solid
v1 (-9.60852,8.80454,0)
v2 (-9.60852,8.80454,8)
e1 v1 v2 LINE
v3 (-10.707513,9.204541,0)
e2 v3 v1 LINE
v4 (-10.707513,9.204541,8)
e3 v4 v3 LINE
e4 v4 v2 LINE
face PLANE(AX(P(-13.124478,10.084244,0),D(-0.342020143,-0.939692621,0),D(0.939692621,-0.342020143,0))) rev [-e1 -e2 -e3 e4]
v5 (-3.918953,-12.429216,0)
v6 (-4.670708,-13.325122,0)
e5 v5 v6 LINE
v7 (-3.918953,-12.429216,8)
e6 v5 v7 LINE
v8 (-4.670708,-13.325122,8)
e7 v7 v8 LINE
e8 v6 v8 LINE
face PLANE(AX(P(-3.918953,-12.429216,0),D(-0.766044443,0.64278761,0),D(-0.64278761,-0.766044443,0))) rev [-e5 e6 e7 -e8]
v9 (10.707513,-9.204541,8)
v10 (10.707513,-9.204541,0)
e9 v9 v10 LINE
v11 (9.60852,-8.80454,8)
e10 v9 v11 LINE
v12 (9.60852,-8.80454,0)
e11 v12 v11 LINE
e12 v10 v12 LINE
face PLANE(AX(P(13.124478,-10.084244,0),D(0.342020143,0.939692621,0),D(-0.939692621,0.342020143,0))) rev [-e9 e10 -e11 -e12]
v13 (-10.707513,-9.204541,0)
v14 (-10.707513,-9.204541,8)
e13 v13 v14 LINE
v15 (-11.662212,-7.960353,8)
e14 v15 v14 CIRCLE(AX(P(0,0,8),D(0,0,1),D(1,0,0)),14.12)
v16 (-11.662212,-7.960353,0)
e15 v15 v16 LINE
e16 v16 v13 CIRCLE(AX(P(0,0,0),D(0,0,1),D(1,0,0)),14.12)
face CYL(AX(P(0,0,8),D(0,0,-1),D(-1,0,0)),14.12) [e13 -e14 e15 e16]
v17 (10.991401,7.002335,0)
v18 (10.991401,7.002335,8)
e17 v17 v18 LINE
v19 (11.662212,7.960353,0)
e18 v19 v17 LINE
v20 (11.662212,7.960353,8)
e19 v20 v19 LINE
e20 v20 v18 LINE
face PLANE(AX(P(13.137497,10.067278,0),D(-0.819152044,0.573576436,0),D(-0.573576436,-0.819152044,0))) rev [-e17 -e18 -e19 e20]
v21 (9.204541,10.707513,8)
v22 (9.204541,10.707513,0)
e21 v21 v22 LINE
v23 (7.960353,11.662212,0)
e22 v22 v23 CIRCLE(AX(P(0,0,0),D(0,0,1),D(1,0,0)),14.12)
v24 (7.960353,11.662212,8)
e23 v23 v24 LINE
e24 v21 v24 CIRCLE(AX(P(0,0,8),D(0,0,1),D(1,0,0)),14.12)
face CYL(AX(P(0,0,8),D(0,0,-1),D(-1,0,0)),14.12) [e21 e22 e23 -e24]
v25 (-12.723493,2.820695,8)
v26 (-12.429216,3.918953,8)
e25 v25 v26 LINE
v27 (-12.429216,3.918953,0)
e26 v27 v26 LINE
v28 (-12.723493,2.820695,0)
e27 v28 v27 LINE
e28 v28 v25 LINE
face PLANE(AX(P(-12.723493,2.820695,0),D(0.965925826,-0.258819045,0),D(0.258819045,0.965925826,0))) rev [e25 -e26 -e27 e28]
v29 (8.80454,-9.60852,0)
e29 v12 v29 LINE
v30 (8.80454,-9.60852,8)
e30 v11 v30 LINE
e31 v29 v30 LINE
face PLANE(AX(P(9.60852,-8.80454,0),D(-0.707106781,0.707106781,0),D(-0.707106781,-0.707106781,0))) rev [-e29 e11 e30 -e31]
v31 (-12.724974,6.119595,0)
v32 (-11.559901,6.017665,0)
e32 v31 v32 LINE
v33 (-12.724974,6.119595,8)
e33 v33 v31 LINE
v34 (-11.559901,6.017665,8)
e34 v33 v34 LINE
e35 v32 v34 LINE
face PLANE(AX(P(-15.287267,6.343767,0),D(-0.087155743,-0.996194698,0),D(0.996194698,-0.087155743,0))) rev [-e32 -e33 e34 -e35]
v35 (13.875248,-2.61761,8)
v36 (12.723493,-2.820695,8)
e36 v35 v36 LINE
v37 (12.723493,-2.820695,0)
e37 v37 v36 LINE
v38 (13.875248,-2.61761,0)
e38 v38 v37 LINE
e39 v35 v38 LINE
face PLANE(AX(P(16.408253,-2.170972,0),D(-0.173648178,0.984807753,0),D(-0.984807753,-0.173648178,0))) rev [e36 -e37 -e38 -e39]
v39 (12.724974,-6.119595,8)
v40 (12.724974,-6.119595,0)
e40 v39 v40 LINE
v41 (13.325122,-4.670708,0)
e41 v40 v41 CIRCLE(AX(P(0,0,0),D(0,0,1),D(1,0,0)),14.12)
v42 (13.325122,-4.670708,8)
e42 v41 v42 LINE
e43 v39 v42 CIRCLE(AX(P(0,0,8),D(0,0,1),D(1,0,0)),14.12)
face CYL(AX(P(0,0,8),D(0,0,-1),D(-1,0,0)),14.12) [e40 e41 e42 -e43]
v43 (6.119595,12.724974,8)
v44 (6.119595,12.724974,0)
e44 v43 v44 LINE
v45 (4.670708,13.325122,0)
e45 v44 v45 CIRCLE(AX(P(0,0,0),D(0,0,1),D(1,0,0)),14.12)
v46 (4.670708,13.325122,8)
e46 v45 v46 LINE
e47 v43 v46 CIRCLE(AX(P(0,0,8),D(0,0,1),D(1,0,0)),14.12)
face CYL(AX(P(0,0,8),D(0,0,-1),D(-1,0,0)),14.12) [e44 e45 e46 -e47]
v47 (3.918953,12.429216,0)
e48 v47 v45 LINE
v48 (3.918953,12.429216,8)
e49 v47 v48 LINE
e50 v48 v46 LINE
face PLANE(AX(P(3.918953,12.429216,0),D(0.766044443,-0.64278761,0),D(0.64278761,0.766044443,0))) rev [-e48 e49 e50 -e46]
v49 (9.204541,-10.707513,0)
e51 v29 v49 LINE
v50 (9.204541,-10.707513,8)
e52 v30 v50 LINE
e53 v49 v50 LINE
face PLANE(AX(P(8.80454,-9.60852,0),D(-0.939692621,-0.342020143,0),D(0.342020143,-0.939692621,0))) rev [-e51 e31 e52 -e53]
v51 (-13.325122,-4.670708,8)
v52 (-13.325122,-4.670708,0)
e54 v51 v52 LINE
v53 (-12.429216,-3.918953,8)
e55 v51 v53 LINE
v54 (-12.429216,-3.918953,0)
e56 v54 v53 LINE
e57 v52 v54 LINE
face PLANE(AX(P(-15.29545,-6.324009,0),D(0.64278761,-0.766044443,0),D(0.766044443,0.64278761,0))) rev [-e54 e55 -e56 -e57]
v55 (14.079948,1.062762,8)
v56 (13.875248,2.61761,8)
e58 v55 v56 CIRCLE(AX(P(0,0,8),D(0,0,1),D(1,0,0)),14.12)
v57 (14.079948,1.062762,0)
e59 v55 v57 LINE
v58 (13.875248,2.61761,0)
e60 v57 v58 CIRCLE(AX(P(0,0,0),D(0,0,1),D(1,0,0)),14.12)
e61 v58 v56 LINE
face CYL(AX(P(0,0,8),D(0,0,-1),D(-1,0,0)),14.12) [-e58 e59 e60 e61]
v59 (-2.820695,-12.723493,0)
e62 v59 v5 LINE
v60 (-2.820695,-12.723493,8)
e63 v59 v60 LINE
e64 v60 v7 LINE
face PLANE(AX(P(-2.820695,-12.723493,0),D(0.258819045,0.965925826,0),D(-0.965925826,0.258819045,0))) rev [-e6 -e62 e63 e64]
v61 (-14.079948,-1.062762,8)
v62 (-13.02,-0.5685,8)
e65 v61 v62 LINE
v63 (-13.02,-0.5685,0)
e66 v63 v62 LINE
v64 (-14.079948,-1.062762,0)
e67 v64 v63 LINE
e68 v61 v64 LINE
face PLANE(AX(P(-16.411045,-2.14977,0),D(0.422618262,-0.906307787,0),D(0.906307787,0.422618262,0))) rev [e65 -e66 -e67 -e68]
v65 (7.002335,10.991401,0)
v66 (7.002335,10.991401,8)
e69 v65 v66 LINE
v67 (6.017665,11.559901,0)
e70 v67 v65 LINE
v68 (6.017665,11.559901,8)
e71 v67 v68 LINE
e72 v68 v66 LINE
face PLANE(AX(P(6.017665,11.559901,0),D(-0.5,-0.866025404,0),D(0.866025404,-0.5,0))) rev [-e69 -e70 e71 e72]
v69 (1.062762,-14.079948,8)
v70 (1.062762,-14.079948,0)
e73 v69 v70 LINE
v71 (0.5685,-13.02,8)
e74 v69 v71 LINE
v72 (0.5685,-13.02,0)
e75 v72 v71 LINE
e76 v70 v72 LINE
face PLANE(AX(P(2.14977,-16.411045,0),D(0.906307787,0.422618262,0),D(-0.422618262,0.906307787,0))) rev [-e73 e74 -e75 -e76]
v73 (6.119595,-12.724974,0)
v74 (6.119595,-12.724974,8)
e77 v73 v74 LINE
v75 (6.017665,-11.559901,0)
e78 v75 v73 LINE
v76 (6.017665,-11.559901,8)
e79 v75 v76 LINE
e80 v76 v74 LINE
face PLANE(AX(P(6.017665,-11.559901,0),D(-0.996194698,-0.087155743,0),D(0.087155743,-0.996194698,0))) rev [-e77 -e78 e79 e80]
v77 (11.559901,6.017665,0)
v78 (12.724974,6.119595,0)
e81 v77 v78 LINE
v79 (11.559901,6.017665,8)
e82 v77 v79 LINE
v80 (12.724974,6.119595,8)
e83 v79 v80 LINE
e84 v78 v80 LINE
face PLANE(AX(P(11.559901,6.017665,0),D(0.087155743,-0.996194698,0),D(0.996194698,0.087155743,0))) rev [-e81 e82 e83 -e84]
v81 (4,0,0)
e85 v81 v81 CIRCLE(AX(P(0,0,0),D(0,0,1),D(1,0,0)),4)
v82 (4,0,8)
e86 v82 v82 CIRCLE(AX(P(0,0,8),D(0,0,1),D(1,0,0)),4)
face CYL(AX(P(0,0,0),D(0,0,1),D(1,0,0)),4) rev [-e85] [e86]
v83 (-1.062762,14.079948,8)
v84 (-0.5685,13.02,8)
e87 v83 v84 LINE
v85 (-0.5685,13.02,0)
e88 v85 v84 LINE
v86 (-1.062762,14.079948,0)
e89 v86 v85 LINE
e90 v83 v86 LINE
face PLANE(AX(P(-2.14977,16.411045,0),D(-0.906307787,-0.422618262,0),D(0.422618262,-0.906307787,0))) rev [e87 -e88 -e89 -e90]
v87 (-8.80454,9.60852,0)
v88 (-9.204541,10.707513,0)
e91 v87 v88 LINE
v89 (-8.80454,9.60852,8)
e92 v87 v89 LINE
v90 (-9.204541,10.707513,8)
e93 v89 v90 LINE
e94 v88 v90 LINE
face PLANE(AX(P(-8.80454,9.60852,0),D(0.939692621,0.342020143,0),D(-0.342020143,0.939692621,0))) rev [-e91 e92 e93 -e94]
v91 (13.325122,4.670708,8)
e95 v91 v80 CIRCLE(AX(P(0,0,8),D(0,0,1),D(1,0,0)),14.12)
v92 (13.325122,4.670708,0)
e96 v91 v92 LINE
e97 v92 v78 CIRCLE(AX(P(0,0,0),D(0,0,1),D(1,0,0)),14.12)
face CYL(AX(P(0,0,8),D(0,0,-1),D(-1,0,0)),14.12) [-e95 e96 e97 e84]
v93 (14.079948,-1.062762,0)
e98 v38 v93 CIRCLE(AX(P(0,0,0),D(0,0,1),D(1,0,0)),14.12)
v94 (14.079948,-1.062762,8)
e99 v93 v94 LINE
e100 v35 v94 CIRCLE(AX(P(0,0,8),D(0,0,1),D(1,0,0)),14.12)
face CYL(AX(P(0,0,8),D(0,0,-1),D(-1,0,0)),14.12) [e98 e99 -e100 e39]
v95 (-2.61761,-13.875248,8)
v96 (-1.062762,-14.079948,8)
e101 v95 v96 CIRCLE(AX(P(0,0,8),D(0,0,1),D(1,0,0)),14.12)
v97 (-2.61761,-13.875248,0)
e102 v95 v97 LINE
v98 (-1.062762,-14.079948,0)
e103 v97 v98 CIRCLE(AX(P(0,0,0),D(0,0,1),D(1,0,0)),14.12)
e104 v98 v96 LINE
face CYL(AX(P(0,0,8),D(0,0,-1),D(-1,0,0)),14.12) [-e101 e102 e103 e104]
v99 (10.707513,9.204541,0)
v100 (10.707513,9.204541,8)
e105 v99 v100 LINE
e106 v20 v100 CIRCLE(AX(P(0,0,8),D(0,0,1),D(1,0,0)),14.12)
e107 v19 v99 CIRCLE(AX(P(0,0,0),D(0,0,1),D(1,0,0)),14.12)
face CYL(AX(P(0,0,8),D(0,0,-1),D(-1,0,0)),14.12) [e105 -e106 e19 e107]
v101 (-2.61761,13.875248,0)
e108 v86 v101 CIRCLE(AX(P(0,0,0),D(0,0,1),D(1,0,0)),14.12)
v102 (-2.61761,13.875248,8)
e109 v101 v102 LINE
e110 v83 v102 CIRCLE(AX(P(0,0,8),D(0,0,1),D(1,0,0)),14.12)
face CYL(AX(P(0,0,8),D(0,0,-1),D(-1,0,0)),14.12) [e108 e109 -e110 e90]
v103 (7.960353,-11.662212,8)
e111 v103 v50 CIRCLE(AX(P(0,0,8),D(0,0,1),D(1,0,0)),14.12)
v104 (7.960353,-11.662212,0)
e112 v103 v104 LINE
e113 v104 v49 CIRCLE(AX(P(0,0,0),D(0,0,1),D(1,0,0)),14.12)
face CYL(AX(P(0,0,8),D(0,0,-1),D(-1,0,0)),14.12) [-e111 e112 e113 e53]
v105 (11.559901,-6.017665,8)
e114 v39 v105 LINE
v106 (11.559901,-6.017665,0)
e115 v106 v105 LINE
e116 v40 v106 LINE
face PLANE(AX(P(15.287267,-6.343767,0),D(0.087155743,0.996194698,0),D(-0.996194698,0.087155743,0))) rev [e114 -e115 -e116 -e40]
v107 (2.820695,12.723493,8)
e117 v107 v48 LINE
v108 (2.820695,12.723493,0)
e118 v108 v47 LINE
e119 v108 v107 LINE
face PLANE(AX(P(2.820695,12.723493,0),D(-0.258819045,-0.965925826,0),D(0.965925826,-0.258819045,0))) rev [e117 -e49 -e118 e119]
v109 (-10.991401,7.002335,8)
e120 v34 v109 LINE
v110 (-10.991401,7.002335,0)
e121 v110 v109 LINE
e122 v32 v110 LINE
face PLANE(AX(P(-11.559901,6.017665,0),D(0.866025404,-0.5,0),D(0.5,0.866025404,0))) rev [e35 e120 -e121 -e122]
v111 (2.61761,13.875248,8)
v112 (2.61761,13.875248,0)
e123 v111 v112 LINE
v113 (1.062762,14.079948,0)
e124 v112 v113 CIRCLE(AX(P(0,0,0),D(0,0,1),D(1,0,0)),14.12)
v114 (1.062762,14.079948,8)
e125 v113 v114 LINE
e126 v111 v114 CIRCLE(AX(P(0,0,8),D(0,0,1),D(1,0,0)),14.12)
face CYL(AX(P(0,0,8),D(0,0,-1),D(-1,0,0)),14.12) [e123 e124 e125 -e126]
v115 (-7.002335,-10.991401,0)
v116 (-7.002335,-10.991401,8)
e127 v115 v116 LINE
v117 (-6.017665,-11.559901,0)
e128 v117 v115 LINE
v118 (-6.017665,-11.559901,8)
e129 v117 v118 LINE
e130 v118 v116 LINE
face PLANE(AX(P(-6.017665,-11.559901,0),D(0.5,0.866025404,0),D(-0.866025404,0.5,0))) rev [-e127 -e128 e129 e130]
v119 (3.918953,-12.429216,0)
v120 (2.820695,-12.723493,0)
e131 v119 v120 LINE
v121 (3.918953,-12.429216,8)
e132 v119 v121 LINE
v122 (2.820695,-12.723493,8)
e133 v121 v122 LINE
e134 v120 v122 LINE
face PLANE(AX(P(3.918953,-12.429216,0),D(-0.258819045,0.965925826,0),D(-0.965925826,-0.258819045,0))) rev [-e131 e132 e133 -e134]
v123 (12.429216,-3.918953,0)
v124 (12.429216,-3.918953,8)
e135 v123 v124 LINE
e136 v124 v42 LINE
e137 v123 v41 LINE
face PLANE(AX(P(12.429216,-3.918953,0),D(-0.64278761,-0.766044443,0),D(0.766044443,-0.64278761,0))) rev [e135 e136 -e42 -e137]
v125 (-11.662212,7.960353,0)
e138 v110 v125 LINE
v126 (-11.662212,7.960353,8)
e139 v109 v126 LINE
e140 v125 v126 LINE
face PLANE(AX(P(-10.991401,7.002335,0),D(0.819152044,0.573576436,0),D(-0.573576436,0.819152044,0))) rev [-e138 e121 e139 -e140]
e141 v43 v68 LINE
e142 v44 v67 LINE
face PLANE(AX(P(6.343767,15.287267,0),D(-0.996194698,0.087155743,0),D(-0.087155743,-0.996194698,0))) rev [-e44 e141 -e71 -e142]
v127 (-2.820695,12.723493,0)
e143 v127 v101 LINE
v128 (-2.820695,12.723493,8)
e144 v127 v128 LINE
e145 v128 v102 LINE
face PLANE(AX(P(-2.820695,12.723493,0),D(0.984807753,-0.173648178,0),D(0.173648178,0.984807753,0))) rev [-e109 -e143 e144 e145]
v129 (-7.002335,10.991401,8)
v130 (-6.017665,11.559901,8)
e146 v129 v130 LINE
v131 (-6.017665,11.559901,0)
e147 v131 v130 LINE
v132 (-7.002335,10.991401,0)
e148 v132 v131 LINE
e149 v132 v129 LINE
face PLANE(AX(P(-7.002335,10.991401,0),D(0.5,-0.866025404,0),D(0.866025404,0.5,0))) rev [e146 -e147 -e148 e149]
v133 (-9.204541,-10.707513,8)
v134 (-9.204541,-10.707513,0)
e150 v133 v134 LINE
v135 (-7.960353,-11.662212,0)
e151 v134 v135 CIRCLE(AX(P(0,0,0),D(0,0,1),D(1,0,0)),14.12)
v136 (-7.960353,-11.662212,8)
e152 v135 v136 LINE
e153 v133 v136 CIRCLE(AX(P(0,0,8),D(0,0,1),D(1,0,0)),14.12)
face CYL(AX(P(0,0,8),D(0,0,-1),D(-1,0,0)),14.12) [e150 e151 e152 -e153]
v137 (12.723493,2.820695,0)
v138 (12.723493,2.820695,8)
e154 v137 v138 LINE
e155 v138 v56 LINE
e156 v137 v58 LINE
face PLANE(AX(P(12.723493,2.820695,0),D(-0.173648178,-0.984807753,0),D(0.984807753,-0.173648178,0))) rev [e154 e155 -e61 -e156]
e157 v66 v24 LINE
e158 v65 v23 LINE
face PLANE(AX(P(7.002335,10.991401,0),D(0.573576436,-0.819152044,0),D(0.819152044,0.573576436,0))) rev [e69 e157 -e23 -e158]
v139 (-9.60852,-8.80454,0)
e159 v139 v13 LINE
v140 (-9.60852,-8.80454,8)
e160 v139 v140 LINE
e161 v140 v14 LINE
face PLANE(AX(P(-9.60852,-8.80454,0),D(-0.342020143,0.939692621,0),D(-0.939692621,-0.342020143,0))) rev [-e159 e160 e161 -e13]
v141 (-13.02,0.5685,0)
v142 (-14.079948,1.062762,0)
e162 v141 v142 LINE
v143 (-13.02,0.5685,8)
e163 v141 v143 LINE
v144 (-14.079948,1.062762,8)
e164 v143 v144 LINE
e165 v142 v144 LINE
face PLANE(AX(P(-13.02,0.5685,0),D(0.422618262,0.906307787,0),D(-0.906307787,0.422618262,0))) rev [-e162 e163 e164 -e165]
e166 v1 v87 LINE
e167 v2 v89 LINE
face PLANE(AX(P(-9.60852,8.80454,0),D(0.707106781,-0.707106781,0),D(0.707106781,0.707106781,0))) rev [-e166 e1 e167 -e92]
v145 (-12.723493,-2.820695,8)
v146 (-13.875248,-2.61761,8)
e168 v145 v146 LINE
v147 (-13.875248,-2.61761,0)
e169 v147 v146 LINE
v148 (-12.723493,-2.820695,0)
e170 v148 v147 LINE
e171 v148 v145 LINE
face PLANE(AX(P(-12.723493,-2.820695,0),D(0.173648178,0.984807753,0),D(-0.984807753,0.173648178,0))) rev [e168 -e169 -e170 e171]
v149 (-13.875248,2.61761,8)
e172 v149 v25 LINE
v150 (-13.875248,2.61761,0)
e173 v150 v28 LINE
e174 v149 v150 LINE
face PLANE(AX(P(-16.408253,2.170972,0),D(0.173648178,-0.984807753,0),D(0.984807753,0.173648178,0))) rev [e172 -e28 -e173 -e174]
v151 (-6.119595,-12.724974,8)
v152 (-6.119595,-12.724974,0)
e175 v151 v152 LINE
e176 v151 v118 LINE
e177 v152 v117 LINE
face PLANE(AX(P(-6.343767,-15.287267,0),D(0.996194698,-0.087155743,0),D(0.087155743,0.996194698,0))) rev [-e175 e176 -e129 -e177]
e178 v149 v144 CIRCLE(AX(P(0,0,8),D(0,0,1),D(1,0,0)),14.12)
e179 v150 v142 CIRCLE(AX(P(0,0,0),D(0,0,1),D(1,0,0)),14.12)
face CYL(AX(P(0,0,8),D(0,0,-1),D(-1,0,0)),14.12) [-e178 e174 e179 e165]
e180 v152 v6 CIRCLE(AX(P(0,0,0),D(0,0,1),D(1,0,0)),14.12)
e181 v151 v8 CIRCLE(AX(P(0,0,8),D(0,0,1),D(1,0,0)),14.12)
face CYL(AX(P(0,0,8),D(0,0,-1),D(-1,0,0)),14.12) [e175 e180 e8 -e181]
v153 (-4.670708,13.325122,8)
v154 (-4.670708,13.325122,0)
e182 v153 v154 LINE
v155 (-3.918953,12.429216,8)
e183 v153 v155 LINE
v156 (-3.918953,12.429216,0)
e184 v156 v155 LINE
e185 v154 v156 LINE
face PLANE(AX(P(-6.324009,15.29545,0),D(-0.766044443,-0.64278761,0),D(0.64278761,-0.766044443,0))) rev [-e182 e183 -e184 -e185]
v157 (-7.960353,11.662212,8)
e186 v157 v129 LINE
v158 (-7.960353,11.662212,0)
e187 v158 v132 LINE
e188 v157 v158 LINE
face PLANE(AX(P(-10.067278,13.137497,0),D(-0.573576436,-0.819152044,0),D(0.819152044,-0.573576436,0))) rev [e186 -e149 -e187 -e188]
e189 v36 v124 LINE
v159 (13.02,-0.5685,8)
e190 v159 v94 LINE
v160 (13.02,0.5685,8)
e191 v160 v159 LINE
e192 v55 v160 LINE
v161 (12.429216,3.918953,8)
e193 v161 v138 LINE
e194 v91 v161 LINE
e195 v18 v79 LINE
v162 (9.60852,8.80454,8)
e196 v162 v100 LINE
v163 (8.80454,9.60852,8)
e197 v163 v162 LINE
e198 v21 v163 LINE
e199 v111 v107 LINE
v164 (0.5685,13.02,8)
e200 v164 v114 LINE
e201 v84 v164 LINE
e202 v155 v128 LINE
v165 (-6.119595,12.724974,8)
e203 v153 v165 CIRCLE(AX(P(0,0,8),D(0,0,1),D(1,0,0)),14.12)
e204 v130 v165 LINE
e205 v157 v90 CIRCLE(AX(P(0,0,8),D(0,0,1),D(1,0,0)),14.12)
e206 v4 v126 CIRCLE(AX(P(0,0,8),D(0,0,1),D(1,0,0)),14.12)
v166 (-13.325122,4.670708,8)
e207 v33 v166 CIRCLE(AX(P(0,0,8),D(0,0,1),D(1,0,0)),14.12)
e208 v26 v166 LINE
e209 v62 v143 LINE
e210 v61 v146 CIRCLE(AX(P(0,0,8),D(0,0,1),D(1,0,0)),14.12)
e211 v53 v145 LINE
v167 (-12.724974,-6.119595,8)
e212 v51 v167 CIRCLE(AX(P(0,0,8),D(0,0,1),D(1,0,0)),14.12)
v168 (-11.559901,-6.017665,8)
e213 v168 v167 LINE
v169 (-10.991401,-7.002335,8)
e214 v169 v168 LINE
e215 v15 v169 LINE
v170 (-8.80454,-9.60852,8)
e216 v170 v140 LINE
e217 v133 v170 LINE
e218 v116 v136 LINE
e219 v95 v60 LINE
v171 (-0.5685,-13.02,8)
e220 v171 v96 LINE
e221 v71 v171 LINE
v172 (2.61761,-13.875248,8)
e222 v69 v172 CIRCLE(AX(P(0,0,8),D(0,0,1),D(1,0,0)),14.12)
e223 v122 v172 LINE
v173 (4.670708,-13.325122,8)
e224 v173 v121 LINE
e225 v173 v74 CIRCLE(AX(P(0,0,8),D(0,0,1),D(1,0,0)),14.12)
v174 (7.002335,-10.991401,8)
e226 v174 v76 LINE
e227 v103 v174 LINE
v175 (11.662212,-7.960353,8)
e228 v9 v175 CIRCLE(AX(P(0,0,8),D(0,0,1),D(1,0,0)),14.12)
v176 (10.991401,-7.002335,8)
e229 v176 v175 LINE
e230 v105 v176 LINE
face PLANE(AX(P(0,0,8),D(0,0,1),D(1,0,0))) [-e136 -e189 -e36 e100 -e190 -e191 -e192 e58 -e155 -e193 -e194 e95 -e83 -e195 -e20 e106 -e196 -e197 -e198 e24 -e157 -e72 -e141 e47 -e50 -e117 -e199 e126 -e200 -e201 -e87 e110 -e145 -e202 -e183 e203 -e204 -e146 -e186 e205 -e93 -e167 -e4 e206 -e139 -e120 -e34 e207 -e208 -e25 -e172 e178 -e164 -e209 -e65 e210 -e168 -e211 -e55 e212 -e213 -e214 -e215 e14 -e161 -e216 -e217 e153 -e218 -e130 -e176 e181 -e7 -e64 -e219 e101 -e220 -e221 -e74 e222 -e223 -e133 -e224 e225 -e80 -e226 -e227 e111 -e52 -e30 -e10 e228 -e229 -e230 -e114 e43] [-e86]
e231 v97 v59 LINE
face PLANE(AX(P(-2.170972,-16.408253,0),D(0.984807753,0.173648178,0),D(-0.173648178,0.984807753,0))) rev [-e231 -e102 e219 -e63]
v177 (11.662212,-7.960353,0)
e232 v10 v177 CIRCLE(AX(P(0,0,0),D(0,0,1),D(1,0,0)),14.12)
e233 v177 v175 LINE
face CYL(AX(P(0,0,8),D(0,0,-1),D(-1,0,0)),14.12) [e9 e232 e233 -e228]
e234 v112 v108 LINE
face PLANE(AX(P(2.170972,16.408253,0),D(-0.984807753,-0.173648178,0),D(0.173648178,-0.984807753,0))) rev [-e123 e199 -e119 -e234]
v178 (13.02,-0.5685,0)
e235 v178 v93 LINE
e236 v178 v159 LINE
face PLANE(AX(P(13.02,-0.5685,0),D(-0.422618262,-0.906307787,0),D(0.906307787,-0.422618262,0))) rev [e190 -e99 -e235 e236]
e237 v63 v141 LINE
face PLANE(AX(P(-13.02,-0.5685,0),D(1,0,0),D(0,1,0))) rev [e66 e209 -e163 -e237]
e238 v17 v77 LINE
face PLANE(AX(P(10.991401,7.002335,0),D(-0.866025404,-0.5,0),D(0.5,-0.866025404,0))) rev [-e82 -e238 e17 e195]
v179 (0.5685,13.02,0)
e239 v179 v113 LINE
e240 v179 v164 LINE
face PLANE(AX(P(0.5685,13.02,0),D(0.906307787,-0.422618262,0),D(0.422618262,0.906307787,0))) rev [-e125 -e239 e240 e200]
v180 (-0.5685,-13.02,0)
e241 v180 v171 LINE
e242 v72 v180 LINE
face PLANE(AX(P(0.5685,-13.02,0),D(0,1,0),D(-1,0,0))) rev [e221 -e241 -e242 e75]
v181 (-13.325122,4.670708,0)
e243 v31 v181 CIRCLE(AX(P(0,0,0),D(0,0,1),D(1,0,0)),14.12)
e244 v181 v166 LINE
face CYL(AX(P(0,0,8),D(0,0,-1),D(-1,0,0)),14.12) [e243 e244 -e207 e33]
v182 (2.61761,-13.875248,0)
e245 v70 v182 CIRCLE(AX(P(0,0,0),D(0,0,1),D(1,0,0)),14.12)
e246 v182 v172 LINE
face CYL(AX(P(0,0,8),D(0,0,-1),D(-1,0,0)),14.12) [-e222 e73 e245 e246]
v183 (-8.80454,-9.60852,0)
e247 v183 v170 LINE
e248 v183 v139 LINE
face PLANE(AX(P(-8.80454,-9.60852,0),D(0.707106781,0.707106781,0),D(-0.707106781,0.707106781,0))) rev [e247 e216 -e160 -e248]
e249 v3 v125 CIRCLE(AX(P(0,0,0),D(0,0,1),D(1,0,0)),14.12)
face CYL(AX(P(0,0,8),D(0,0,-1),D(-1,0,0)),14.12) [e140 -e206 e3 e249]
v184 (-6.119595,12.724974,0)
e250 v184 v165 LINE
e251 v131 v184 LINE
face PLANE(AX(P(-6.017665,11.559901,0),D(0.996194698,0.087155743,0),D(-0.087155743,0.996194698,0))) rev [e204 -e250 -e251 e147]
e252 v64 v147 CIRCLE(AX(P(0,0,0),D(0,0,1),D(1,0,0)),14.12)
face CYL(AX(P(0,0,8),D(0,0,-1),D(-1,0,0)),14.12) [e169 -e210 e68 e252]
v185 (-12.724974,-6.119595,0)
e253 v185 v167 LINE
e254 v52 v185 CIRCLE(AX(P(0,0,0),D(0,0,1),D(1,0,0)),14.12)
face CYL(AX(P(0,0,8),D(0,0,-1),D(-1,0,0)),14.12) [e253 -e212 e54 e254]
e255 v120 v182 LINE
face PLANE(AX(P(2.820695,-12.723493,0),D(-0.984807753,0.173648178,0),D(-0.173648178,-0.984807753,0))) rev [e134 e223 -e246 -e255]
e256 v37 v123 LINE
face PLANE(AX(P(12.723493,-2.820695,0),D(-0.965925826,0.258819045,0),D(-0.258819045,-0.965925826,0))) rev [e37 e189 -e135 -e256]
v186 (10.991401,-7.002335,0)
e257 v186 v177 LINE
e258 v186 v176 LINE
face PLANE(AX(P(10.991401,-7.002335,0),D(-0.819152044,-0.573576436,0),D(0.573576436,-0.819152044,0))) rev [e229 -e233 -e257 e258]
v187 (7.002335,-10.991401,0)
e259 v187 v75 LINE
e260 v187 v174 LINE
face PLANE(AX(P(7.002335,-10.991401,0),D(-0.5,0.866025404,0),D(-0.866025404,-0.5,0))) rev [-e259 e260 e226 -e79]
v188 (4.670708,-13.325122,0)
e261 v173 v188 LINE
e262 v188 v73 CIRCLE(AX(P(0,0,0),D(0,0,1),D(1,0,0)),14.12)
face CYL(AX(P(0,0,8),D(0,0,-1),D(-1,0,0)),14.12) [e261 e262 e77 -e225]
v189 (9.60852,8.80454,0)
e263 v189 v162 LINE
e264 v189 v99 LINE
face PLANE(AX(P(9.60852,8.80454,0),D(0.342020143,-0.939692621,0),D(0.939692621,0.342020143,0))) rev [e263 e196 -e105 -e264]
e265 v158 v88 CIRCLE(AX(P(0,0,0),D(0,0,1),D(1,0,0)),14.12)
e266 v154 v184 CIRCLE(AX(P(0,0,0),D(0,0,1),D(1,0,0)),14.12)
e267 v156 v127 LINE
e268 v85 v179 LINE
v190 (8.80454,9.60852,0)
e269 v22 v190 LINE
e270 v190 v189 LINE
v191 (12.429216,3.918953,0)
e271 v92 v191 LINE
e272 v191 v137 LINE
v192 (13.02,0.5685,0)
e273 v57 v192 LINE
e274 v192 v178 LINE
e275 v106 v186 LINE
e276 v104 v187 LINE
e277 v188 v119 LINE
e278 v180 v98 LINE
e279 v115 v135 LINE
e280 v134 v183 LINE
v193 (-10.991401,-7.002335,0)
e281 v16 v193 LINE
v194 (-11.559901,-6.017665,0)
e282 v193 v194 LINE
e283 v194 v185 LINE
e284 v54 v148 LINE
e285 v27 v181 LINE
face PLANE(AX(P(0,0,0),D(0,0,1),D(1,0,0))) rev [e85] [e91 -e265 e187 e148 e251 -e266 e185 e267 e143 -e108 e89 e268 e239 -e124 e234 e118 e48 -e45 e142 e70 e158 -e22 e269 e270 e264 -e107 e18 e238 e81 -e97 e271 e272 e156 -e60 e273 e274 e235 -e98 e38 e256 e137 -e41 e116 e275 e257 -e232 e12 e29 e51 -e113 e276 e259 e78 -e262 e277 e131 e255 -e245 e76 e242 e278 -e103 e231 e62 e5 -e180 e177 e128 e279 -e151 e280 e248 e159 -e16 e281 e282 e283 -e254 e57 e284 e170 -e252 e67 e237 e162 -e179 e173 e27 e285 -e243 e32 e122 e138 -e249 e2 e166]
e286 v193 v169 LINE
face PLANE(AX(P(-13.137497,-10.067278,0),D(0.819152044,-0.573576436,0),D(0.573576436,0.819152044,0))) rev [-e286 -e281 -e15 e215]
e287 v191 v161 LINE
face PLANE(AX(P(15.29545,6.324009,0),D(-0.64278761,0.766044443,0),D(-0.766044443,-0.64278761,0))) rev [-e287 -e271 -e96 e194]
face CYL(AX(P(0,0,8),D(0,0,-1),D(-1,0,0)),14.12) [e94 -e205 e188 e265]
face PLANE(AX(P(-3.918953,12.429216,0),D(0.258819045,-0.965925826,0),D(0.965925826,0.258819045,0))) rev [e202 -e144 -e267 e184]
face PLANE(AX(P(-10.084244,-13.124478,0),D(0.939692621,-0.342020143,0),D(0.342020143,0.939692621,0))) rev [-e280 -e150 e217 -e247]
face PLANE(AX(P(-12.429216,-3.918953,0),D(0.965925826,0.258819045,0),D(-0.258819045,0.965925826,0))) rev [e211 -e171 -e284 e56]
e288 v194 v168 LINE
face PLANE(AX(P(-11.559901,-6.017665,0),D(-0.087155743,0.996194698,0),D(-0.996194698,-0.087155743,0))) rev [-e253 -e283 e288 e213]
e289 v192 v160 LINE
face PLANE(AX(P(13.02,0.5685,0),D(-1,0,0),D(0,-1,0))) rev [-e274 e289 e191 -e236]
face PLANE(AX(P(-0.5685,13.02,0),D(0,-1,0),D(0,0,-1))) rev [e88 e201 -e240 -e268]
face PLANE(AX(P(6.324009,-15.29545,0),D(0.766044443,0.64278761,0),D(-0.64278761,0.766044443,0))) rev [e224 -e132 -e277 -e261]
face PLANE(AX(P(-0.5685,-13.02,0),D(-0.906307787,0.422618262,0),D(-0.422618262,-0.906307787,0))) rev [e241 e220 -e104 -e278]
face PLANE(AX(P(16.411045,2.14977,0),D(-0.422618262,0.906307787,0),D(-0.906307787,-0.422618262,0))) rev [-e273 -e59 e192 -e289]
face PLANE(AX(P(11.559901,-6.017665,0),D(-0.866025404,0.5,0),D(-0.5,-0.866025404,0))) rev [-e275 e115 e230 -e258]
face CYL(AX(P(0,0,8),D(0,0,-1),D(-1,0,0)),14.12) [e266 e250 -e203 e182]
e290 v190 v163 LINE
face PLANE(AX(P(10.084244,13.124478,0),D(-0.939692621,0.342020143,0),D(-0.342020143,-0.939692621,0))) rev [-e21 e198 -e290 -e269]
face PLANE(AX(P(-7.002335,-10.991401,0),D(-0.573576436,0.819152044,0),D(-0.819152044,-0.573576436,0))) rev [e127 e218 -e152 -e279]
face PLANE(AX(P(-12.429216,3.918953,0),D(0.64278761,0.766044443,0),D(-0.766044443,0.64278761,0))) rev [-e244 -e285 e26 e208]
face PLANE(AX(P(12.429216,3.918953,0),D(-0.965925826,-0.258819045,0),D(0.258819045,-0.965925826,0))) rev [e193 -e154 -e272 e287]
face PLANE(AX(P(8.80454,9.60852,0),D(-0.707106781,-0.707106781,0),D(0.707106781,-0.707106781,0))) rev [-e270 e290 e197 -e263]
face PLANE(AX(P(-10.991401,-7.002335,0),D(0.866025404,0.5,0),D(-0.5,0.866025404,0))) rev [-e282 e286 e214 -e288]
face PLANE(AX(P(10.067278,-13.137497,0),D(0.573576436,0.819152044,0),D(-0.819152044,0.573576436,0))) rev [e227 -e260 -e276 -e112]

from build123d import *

# Parameters (mm, degrees)
ESQUISSE1_R                  = 14.12
EXTRUSION1_DEPTH             = 8
EXTRUSION2_DEPTH             = 22.511596872
R_P_TITION_CIRCULAIRE1_DEPTH = 8
ESQUISSE3_R                  = 4
EXTRUSION3_DEPTH             = 22.459027804


# Read off the part's stored shape, not the designer's step: Répétition circulaire1
with BuildPart() as part:
    # Esquisse1 → Extrusion1 (new body)
    with BuildSketch(Plane.XY):
        Circle(ESQUISSE1_R)
    extrude(amount=EXTRUSION1_DEPTH)

    # Esquisse2 → Extrusion2 (cut, through all)
    with BuildSketch(Plane.XY.offset(8)):
        Polygon((-0.5685, 13.02), (0.5685, 13.02), (2.149770097, 16.411044667), (-2.149770097, 16.411044667), align=None)
    extrude(amount=-EXTRUSION2_DEPTH, mode=Mode.SUBTRACT)

    # Répétition circulaire1 outline → Répétition circulaire1 (cut)
    with BuildSketch(Plane.XY):
        with BuildLine():
            ThreePointArc((-2.617609549, 13.875248475), (-3.654524917, 13.638872667), (-4.670707871, 13.325122438))
            Line((-4.670707871, 13.325122438), (-3.918952799, 12.429215631))
            Line((-3.918952799, 12.429215631), (-2.820695135, 12.723492885))
            Line((-2.820695135, 12.723492885), (-2.617609549, 13.875248475))
        make_face()
        with BuildLine():
            Line((3.918952799, 12.429215631), (4.670707871, 13.325122438))
            ThreePointArc((4.670707871, 13.325122438), (3.654524917, 13.638872667), (2.617609549, 13.875248475))
            Line((2.617609549, 13.875248475), (2.820695135, 12.723492885))
            Line((2.820695135, 12.723492885), (3.918952799, 12.429215631))
        make_face()
        with BuildLine():
            Line((7.002335442, 10.991400757), (7.960352825, 11.66221175))
            ThreePointArc((7.960352825, 11.66221175), (7.06, 12.228278701), (6.119595228, 12.724973644))
            Line((6.119595228, 12.724973644), (6.017664558, 11.559900757))
            Line((6.017664558, 11.559900757), (7.002335442, 10.991400757))
        make_face()
        with BuildLine():
            Line((9.608520496, 8.804540086), (10.707512889, 9.204540604))
            ThreePointArc((10.707512889, 9.204540604), (9.98434775, 9.98434775), (9.204540604, 10.707512889))
            Line((9.204540604, 10.707512889), (8.804540086, 9.608520496))
            Line((8.804540086, 9.608520496), (9.608520496, 8.804540086))
        make_face()
        with BuildLine():
            Line((11.559900757, 6.017664558), (12.724973644, 6.119595228))
            ThreePointArc((12.724973644, 6.119595228), (12.228278701, 7.06), (11.66221175, 7.960352825))
            Line((11.66221175, 7.960352825), (10.991400757, 7.002335442))
            Line((10.991400757, 7.002335442), (11.559900757, 6.017664558))
        make_face()
        with BuildLine():
            Line((12.723492885, 2.820695135), (13.875248475, 2.617609549))
            ThreePointArc((13.875248475, 2.617609549), (13.638872667, 3.654524917), (13.325122438, 4.670707871))
            Line((13.325122438, 4.670707871), (12.429215631, 3.918952799))
            Line((12.429215631, 3.918952799), (12.723492885, 2.820695135))
        make_face()
        with BuildLine():
            Line((13.02, -0.5685), (14.079948052, -1.062761894))
            ThreePointArc((14.079948052, -1.062761894), (14.12, 0), (14.079948052, 1.062761894))
            Line((14.079948052, 1.062761894), (13.02, 0.5685))
            Line((13.02, 0.5685), (13.02, -0.5685))
        make_face()
        with BuildLine():
            Line((12.429215631, -3.918952799), (13.325122438, -4.670707871))
            ThreePointArc((13.325122438, -4.670707871), (13.638872667, -3.654524917), (13.875248475, -2.617609549))
            Line((13.875248475, -2.617609549), (12.723492885, -2.820695135))
            Line((12.723492885, -2.820695135), (12.429215631, -3.918952799))
        make_face()
        with BuildLine():
            Line((10.991400757, -7.002335442), (11.66221175, -7.960352825))
            ThreePointArc((11.66221175, -7.960352825), (12.228278701, -7.06), (12.724973644, -6.119595228))
            Line((12.724973644, -6.119595228), (11.559900757, -6.017664558))
            Line((11.559900757, -6.017664558), (10.991400757, -7.002335442))
        make_face()
        with BuildLine():
            Line((8.804540086, -9.608520496), (9.204540604, -10.707512889))
            ThreePointArc((9.204540604, -10.707512889), (9.98434775, -9.98434775), (10.707512889, -9.204540604))
            Line((10.707512889, -9.204540604), (9.608520496, -8.804540086))
            Line((9.608520496, -8.804540086), (8.804540086, -9.608520496))
        make_face()
        with BuildLine():
            Line((6.017664558, -11.559900757), (6.119595228, -12.724973644))
            ThreePointArc((6.119595228, -12.724973644), (7.06, -12.228278701), (7.960352825, -11.66221175))
            Line((7.960352825, -11.66221175), (7.002335442, -10.991400757))
            Line((7.002335442, -10.991400757), (6.017664558, -11.559900757))
        make_face()
        with BuildLine():
            Line((2.820695135, -12.723492885), (2.617609549, -13.875248475))
            ThreePointArc((2.617609549, -13.875248475), (3.654524917, -13.638872667), (4.670707871, -13.325122438))
            Line((4.670707871, -13.325122438), (3.918952799, -12.429215631))
            Line((3.918952799, -12.429215631), (2.820695135, -12.723492885))
        make_face()
        with BuildLine():
            Line((-0.5685, -13.02), (-1.062761894, -14.079948052))
            ThreePointArc((-1.062761894, -14.079948052), (0, -14.12), (1.062761894, -14.079948052))
            Line((1.062761894, -14.079948052), (0.5685, -13.02))
            Line((0.5685, -13.02), (-0.5685, -13.02))
        make_face()
        with BuildLine():
            Line((-3.918952799, -12.429215631), (-4.670707871, -13.325122438))
            ThreePointArc((-4.670707871, -13.325122438), (-3.654524917, -13.638872667), (-2.617609549, -13.875248475))
            Line((-2.617609549, -13.875248475), (-2.820695135, -12.723492885))
            Line((-2.820695135, -12.723492885), (-3.918952799, -12.429215631))
        make_face()
        with BuildLine():
            Line((-7.002335442, -10.991400757), (-7.960352825, -11.66221175))
            ThreePointArc((-7.960352825, -11.66221175), (-7.06, -12.228278701), (-6.119595228, -12.724973644))
            Line((-6.119595228, -12.724973644), (-6.017664558, -11.559900757))
            Line((-6.017664558, -11.559900757), (-7.002335442, -10.991400757))
        make_face()
        with BuildLine():
            Line((-9.608520496, -8.804540086), (-10.707512889, -9.204540604))
            ThreePointArc((-10.707512889, -9.204540604), (-9.98434775, -9.98434775), (-9.204540604, -10.707512889))
            Line((-9.204540604, -10.707512889), (-8.804540086, -9.608520496))
            Line((-8.804540086, -9.608520496), (-9.608520496, -8.804540086))
        make_face()
        with BuildLine():
            Line((-11.559900757, -6.017664558), (-12.724973644, -6.119595228))
            ThreePointArc((-12.724973644, -6.119595228), (-12.228278701, -7.06), (-11.66221175, -7.960352825))
            Line((-11.66221175, -7.960352825), (-10.991400757, -7.002335442))
            Line((-10.991400757, -7.002335442), (-11.559900757, -6.017664558))
        make_face()
        with BuildLine():
            Line((-12.723492885, -2.820695135), (-13.875248475, -2.617609549))
            ThreePointArc((-13.875248475, -2.617609549), (-13.638872667, -3.654524917), (-13.325122438, -4.670707871))
            Line((-13.325122438, -4.670707871), (-12.429215631, -3.918952799))
            Line((-12.429215631, -3.918952799), (-12.723492885, -2.820695135))
        make_face()
        with BuildLine():
            Line((-13.02, 0.5685), (-14.079948052, 1.062761894))
            ThreePointArc((-14.079948052, 1.062761894), (-14.12, 0), (-14.079948052, -1.062761894))
            Line((-14.079948052, -1.062761894), (-13.02, -0.5685))
            Line((-13.02, -0.5685), (-13.02, 0.5685))
        make_face()
        with BuildLine():
            Line((-12.429215631, 3.918952799), (-13.325122438, 4.670707871))
            ThreePointArc((-13.325122438, 4.670707871), (-13.638872667, 3.654524917), (-13.875248475, 2.617609549))
            Line((-13.875248475, 2.617609549), (-12.723492885, 2.820695135))
            Line((-12.723492885, 2.820695135), (-12.429215631, 3.918952799))
        make_face()
        with BuildLine():
            Line((-10.991400757, 7.002335442), (-11.66221175, 7.960352825))
            ThreePointArc((-11.66221175, 7.960352825), (-12.228278701, 7.06), (-12.724973644, 6.119595228))
            Line((-12.724973644, 6.119595228), (-11.559900757, 6.017664558))
            Line((-11.559900757, 6.017664558), (-10.991400757, 7.002335442))
        make_face()
        with BuildLine():
            Line((-8.804540086, 9.608520496), (-9.204540604, 10.707512889))
            ThreePointArc((-9.204540604, 10.707512889), (-9.98434775, 9.98434775), (-10.707512889, 9.204540604))
            Line((-10.707512889, 9.204540604), (-9.608520496, 8.804540086))
            Line((-9.608520496, 8.804540086), (-8.804540086, 9.608520496))
        make_face()
        with BuildLine():
            Line((-6.017664558, 11.559900757), (-6.119595228, 12.724973644))
            ThreePointArc((-6.119595228, 12.724973644), (-7.06, 12.228278701), (-7.960352825, 11.66221175))
            Line((-7.960352825, 11.66221175), (-7.002335442, 10.991400757))
            Line((-7.002335442, 10.991400757), (-6.017664558, 11.559900757))
        make_face()
    extrude(amount=R_P_TITION_CIRCULAIRE1_DEPTH, mode=Mode.SUBTRACT)

    # Esquisse3 → Extrusion3 (cut, through all)
    with BuildSketch(Plane.XY.offset(8)):
        Circle(ESQUISSE3_R)
    extrude(amount=-EXTRUSION3_DEPTH, mode=Mode.SUBTRACT)


solid = part.part
